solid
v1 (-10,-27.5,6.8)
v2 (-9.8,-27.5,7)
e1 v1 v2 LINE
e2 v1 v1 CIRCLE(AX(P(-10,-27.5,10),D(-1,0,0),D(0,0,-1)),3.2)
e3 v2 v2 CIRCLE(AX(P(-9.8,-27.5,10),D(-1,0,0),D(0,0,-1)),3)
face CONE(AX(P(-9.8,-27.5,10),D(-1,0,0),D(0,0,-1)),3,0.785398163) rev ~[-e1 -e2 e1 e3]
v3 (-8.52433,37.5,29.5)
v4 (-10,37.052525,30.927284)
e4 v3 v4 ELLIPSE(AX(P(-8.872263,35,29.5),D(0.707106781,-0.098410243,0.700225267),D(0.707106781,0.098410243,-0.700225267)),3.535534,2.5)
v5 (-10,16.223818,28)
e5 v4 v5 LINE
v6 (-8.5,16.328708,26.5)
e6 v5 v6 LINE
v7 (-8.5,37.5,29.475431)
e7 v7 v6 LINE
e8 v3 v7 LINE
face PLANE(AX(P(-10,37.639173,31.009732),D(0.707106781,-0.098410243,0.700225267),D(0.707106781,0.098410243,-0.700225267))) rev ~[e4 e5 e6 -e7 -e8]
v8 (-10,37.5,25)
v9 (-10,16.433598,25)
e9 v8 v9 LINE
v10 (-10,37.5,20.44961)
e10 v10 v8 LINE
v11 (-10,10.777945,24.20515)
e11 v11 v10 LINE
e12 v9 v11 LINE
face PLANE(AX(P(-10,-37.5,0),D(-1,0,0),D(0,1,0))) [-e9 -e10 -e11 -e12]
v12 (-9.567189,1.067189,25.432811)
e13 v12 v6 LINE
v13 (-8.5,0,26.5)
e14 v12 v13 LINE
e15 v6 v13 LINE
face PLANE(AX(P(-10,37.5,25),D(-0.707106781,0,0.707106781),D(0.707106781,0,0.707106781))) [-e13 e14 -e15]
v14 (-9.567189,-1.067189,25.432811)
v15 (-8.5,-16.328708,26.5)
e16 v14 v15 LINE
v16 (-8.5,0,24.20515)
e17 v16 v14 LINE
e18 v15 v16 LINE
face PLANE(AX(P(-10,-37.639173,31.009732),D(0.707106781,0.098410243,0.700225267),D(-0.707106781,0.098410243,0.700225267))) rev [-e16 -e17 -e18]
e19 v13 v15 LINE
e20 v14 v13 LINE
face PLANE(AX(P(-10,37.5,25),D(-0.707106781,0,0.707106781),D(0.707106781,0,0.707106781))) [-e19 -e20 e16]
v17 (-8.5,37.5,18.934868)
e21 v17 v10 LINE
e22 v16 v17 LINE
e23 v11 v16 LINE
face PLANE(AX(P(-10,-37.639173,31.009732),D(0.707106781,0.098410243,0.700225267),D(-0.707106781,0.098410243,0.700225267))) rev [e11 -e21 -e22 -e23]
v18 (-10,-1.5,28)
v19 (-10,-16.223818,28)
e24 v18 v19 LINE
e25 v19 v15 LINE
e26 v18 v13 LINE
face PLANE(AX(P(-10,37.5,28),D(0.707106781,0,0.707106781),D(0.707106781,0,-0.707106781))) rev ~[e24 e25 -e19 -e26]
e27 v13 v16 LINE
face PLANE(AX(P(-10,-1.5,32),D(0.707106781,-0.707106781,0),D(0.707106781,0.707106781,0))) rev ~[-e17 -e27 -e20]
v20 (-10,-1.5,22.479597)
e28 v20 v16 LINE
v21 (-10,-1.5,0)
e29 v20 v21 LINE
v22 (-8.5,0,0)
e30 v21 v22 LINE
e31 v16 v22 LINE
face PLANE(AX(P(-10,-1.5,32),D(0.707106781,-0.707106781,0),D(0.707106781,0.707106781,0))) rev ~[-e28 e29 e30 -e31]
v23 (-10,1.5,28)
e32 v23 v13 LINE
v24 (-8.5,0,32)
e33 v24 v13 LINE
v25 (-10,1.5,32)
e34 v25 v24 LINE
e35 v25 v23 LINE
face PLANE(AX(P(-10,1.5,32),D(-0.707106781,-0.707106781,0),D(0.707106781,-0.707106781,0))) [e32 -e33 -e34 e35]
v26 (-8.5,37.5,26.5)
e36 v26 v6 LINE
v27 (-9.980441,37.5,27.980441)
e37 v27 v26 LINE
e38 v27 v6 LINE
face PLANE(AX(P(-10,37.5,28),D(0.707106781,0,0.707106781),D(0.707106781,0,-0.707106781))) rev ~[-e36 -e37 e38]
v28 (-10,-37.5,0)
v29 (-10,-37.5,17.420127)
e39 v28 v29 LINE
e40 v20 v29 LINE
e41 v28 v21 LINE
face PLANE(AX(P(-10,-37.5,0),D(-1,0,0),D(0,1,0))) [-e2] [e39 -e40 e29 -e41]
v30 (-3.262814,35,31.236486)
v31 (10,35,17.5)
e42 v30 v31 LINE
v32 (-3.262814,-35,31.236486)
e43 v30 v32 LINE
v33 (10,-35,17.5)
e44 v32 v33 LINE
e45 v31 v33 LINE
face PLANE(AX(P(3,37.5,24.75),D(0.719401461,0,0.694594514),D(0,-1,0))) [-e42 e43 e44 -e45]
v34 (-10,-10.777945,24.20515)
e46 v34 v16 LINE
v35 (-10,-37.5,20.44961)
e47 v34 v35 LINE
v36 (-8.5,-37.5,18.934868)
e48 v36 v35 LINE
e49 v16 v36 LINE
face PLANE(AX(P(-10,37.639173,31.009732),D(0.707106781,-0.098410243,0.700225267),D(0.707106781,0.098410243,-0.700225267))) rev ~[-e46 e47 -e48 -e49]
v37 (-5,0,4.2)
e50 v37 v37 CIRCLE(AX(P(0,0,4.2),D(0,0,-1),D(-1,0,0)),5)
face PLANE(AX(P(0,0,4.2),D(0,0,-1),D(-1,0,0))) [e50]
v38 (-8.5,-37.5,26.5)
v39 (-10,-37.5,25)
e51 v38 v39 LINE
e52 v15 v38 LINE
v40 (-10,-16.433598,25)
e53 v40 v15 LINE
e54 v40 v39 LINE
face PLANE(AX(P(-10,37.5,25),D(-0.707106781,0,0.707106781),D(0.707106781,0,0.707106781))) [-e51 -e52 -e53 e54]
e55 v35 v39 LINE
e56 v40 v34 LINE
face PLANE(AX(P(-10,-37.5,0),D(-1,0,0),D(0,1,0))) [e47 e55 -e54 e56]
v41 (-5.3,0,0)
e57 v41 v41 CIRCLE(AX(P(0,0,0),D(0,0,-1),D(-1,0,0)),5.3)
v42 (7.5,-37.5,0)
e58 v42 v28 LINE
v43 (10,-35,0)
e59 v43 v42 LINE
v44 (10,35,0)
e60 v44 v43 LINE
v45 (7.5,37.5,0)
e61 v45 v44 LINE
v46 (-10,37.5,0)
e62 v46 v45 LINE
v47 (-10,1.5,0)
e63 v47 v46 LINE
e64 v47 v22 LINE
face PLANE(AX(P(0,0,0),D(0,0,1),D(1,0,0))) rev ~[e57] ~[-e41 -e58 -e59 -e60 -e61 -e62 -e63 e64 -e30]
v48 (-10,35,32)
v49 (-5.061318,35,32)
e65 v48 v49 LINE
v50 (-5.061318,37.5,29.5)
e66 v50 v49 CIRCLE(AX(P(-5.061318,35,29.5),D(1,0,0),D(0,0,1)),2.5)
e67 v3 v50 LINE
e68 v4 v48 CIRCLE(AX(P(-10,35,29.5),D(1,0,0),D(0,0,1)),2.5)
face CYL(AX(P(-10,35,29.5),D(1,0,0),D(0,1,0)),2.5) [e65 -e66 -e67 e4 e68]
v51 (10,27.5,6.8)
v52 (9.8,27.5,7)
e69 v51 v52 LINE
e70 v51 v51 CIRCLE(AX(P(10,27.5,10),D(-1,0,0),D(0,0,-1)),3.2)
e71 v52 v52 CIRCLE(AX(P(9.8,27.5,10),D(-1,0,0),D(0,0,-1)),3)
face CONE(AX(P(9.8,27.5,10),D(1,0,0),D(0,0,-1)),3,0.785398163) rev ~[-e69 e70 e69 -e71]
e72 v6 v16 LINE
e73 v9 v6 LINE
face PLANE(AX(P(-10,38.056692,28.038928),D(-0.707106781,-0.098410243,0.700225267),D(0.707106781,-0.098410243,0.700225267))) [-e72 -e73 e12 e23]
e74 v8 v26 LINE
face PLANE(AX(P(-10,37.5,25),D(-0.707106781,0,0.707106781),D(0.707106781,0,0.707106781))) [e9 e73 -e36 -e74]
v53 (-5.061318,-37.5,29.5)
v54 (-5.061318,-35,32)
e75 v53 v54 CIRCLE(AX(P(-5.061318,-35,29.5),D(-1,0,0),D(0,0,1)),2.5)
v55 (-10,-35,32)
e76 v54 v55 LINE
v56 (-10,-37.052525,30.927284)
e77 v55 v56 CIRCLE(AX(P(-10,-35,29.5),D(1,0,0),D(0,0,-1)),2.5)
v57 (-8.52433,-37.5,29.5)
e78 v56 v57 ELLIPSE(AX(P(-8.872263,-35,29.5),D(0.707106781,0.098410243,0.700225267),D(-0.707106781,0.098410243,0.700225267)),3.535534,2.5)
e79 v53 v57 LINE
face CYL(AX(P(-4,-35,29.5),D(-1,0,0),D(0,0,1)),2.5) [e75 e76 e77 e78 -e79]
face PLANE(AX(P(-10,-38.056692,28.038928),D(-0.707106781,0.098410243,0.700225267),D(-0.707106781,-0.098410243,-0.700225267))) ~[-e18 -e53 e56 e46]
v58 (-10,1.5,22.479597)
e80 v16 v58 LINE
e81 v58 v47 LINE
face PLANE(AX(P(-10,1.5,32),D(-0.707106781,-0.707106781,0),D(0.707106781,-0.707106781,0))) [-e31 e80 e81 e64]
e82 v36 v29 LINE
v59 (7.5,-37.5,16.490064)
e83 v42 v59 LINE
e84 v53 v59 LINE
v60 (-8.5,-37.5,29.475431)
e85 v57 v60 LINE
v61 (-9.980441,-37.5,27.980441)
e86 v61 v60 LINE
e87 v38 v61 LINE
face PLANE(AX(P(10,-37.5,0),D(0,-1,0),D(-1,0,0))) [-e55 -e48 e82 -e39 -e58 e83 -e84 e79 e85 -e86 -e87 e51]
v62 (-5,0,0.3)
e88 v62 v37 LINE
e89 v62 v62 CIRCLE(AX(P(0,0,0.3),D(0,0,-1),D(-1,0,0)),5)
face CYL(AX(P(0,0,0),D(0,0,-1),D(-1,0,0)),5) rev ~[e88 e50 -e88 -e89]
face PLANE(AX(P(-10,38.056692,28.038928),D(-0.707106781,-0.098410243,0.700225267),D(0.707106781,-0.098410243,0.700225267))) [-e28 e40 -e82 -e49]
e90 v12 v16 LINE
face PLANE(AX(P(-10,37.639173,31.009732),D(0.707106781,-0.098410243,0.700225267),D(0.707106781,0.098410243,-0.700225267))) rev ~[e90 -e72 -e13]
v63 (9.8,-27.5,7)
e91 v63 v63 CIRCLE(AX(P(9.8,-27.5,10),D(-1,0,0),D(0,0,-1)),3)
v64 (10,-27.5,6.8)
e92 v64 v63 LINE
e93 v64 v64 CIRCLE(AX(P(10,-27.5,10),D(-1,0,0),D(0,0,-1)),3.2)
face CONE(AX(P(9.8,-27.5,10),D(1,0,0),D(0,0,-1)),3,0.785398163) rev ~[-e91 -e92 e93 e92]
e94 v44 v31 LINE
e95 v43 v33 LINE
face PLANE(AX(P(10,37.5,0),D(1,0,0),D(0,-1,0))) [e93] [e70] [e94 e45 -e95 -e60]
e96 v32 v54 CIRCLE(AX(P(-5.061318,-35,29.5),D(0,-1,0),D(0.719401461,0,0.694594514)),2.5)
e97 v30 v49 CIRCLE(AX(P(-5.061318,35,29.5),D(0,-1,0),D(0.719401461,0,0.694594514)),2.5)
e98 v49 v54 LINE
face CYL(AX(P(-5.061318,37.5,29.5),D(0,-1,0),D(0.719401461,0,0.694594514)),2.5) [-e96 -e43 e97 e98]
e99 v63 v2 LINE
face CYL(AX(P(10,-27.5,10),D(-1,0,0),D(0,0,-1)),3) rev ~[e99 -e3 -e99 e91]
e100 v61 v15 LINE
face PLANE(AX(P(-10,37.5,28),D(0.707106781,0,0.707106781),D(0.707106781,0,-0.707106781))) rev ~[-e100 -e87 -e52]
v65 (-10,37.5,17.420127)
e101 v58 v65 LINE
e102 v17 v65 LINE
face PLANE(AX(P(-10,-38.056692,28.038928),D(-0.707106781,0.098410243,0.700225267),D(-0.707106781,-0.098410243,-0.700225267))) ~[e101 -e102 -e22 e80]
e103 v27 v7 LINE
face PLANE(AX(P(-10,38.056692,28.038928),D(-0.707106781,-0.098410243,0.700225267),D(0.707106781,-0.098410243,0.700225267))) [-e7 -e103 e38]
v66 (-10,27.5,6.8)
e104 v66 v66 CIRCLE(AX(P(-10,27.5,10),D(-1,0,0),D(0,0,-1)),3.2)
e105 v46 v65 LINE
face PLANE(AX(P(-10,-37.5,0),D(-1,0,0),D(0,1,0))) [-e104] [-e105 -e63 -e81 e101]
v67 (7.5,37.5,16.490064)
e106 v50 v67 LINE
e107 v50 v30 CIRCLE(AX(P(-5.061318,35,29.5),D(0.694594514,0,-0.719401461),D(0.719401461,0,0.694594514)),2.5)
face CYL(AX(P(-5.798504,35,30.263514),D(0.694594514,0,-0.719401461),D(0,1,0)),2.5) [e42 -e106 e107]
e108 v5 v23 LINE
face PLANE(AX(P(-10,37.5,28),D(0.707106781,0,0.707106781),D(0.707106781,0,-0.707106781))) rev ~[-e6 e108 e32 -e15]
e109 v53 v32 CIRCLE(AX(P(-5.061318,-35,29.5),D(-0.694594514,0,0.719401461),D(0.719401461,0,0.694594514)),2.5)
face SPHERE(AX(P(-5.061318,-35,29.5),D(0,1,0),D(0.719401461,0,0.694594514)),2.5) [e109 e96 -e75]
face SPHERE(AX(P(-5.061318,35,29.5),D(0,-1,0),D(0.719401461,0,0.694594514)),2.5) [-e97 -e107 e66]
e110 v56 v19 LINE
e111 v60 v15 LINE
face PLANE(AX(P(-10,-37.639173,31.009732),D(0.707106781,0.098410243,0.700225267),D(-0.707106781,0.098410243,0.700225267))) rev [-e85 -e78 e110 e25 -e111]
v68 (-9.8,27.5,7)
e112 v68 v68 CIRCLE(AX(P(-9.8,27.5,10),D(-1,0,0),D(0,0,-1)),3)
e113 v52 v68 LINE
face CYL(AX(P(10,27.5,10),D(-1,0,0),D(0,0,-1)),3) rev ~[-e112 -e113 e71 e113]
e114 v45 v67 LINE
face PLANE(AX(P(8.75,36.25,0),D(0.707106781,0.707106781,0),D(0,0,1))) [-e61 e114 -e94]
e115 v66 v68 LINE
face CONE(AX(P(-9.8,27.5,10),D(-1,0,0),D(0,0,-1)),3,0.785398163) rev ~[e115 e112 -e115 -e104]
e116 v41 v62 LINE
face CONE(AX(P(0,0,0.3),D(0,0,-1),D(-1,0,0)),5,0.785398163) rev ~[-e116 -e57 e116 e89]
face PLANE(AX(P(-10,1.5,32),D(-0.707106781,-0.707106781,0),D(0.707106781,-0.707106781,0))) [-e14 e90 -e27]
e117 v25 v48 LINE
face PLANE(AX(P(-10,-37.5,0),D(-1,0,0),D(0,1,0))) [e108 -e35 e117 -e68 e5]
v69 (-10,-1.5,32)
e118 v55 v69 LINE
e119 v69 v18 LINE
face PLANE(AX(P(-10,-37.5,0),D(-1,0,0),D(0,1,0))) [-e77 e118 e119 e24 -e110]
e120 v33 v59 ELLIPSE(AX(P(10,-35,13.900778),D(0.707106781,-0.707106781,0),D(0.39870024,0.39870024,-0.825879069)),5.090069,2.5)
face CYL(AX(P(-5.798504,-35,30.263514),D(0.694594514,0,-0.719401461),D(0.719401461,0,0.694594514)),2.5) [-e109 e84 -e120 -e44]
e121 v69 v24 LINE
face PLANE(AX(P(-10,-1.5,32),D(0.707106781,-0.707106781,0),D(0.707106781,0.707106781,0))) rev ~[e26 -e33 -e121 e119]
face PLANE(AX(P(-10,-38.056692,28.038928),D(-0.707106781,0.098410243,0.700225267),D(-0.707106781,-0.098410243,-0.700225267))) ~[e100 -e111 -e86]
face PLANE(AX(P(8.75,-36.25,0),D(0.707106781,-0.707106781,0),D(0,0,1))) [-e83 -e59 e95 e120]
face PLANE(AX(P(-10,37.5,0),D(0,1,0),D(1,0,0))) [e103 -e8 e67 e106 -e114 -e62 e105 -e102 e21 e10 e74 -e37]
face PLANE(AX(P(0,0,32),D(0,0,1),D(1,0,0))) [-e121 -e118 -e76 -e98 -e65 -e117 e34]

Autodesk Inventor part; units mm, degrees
ref_plane "YZ Plane" through (0, 0, 0) normal (1, 0, 0) x (0, 1, 0)
ref_plane "XZ Plane" through (0, 0, 0) normal (0, 1, 0) x (-1, 0, 0)
sketch "Szkic1" plane through (0, 0, 0) normal (0, 0, 1) x (1, 0, 0)
  line L0 (-10, 37.5) -> (10, 37.5)
  line L1 (10, 37.5) -> (10, -37.5)
  line L2 (10, -37.5) -> (-10, -37.5)
  line L3 (-10, -37.5) -> (-10, 37.5)
  point P0 (0, 0)
  dimension "d0" = 20
  dimension "d1" = 75
  dimension "d39" = 37.5
  dimension "d40" = 10
extrude "Wyciągnięcie proste1" add sketch "Szkic1" along normal blind 32
sketch "Szkic2" plane through (10, -37.5, 0) normal (1, 0, 0) x (0, 0, -1)
  line L0 (0, 75) -> (0, 0) projected
  line L1 (0, 75) -> (-32, 75) projected
  line L2 (-32, 0) -> (-32, 75) projected
  line L3 (0, 0) -> (-32, 0) projected
  point P0 (0, 37.5)
  point P1 (-10, 10)
  point P2 (-10, 65)
  dimension "d4" = 32
  dimension "d5" = 10
  dimension "d6" = 10
  dimension "d7" = 10
  dimension "d8" = 10
hole "Otwór1" at (10, -27.5, 10) at (10, 27.5, 10) direction (-1, 0, 0) diameter 6 end through all
sketch "Szkic3" plane through (-10, 37.5, 0) normal (0, 1, 0) x (1, 0, 0)
  line L0 (0, 0) -> (20, 0) projected
  line L1 (0, 0) -> (0, -32) projected
  line L2 (20, -32) -> (0, -32) projected
  line L3 (20, 0) -> (20, -32) projected
  line L4 (0, -28) -> (1.5, -26.5)
  line L5 (0, -28) -> (2.2095, -28) construction
  line L6 (0, 0) -> (0, -32) projected
  line L7 (0, -25) -> (1.5, -26.5)
  line L8 (0, -25) -> (2.7592, -25) construction
  dimension "d17" = 45
  dimension "d19" = 45
  dimension "d20" = 3
  dimension "d21" = 4
extrude "Wyciągnięcie proste2" cut sketch "Szkic3" against normal through all contours L7 L4 L1
chamfer "Faza1" distance 14 distance2 14.5 1 edges at (10, 0, 32) measured on face at (-3.3333, 12.5, 32)
chamfer "Faza2" distance 2.5 angle 45 2 edges at (10, -37.5, 8.75) (10, 37.5, 8.75)
ref_plane "Płaszczyzna konstrukcyjna1" through (-10, 37.5, 32) normal (0, -0.9902681, -0.1391731) x (-1, 0, 0)
sketch "Szkic4" plane through (-10, 37.5, 32) normal (0, -0.9902681, -0.1391731) x (-1, 0, 0)
  line L0 (-17.5, 31.6886) -> (-17.5, 11.7948) projected
  line L1 (0, 31.6886) -> (-17.5, 31.6886) projected
  line L2 (0, 31.6886) -> (0, 6.9319) projected
  line L3 (0, 6.9319) -> (-1.5, 5.4465) projected
  line L4 (-1.5, 5.4465) -> (0, 3.9611) projected
  line L5 (0, 3.9611) -> (0, 0) projected
  line L6 (-6, 0) -> (0, 0) projected
  line L7 (-17.5, 11.7948) -> (-6, 0) projected
  line L8 (0, -3.5061) -> (0, 6.9319) projected
  line L9 (0, 1) -> (-1.5, 2.5)
  line L10 (0, 1) -> (2.5951, 1) construction
  line L11 (0, 31.6886) -> (0, 6.9319) projected
  line L12 (0, 4) -> (-1.5, 2.5)
  line L13 (0, 4) -> (3.5979, 4) construction
  line L14 (0, 1) -> (0, 4)
  point P0 (-10, 26.4696)
  dimension "d32" = 135
  dimension "d34" = 135
  dimension "d35" = 3
  dimension "d36" = 1
extrude "Wyciągnięcie proste3" cut sketch "Szkic4" along normal through all contours L8 L4 L12 | L9 L12 L4 L5
mirror "Odbicie lustrzane1" about plane through (0, 0, 0) normal (0, 1, 0) of "Wyciągnięcie proste3"
sketch "Szkic5" plane through (0, 0, 32) normal (0, 0, 1) x (1, 0, 0)
  line L0 (-4, 37.5) -> (-4, -37.5) projected
  line L1 (-4, 37.5) -> (-10, 37.5) projected
  line L2 (-10, 37.5) -> (-10, -37.5) projected
  line L3 (-10, -37.5) -> (-4, -37.5) projected
  line L4 (-10, 1.5) -> (-4.369, 1.5) construction
  line L5 (-10, -37.5) -> (-10, 0) projected
  line L6 (-10, -1.5) -> (-2.768, -1.5) construction
  line L7 (-10, -1.5) -> (-8.5, 0)
  line L8 (-10, 1.5) -> (-8.5, 0)
  point P0 (0, 0)
  dimension "d45" = 3
  dimension "d46" = 45
  dimension "d47" = 45
  dimension "d48" = 75
  dimension "d49" = 36
extrude "Wyciągnięcie proste4" cut sketch "Szkic5" against normal through all contours L8 L7 L2
fillet "Zaokrąglenie1" radius 2.5 5 edges at (-4, 0, 32) (1.75, 37.5, 26.0446) (1.75, -37.5, 26.0446) (-7, -37.5, 32) (-7, 37.5, 32)
chamfer "Faza3" distance 0.2 angle 45 4 edges at (-10, 27.5, 13) (-10, -27.5, 13) (10, -27.5, 13) (10, 27.5, 13)
sketch "Szkic6" plane through (0, 0, 0) normal (0, 0, -1) x (-1, 0, 0)
  circle A0 centre (0, 0) radius 5
  line L0 (10, -1.5) -> (8.5, 0) projected
  line L1 (8.5, 0) -> (10, 1.5) projected
  line L2 (10, 1.5) -> (10, 37.5) projected
  line L3 (10, 37.5) -> (-7.5, 37.5) projected
  line L4 (-10, 35) -> (-7.5, 37.5) projected
  line L5 (-10, 35) -> (-10, -35) projected
  line L6 (-7.5, -37.5) -> (-10, -35) projected
  line L7 (-7.5, -37.5) -> (10, -37.5) projected
  line L8 (10, -37.5) -> (10, -1.5) projected
  point P0 (0, 0)
  dimension "d56" = 10
  dimension "d57" = 75
  dimension "d58" = 37.5
  dimension "d59" = 20
  dimension "d60" = 10
extrude "Wyciągnięcie proste5" cut sketch "Szkic6" against normal blind 4.2 contours A0
chamfer "Faza4" distance 0.3 angle 45 1 edges at (5, 0, 0)
equation "\"d39\" = 0.5 * d1"
equation "\"d40\" = 0.5 * d0"
equation "\"d6\" = d5"
equation "\"d8\" = d7"
equation "\"d49\" = -0.5 * d45 + 0.5 * d48"
equation "\"d58\" = 0.5 * d57"
equation "\"d60\" = 0.5 * d59"
properties part number "3DP_ABS_Jaw_Second_Half"
